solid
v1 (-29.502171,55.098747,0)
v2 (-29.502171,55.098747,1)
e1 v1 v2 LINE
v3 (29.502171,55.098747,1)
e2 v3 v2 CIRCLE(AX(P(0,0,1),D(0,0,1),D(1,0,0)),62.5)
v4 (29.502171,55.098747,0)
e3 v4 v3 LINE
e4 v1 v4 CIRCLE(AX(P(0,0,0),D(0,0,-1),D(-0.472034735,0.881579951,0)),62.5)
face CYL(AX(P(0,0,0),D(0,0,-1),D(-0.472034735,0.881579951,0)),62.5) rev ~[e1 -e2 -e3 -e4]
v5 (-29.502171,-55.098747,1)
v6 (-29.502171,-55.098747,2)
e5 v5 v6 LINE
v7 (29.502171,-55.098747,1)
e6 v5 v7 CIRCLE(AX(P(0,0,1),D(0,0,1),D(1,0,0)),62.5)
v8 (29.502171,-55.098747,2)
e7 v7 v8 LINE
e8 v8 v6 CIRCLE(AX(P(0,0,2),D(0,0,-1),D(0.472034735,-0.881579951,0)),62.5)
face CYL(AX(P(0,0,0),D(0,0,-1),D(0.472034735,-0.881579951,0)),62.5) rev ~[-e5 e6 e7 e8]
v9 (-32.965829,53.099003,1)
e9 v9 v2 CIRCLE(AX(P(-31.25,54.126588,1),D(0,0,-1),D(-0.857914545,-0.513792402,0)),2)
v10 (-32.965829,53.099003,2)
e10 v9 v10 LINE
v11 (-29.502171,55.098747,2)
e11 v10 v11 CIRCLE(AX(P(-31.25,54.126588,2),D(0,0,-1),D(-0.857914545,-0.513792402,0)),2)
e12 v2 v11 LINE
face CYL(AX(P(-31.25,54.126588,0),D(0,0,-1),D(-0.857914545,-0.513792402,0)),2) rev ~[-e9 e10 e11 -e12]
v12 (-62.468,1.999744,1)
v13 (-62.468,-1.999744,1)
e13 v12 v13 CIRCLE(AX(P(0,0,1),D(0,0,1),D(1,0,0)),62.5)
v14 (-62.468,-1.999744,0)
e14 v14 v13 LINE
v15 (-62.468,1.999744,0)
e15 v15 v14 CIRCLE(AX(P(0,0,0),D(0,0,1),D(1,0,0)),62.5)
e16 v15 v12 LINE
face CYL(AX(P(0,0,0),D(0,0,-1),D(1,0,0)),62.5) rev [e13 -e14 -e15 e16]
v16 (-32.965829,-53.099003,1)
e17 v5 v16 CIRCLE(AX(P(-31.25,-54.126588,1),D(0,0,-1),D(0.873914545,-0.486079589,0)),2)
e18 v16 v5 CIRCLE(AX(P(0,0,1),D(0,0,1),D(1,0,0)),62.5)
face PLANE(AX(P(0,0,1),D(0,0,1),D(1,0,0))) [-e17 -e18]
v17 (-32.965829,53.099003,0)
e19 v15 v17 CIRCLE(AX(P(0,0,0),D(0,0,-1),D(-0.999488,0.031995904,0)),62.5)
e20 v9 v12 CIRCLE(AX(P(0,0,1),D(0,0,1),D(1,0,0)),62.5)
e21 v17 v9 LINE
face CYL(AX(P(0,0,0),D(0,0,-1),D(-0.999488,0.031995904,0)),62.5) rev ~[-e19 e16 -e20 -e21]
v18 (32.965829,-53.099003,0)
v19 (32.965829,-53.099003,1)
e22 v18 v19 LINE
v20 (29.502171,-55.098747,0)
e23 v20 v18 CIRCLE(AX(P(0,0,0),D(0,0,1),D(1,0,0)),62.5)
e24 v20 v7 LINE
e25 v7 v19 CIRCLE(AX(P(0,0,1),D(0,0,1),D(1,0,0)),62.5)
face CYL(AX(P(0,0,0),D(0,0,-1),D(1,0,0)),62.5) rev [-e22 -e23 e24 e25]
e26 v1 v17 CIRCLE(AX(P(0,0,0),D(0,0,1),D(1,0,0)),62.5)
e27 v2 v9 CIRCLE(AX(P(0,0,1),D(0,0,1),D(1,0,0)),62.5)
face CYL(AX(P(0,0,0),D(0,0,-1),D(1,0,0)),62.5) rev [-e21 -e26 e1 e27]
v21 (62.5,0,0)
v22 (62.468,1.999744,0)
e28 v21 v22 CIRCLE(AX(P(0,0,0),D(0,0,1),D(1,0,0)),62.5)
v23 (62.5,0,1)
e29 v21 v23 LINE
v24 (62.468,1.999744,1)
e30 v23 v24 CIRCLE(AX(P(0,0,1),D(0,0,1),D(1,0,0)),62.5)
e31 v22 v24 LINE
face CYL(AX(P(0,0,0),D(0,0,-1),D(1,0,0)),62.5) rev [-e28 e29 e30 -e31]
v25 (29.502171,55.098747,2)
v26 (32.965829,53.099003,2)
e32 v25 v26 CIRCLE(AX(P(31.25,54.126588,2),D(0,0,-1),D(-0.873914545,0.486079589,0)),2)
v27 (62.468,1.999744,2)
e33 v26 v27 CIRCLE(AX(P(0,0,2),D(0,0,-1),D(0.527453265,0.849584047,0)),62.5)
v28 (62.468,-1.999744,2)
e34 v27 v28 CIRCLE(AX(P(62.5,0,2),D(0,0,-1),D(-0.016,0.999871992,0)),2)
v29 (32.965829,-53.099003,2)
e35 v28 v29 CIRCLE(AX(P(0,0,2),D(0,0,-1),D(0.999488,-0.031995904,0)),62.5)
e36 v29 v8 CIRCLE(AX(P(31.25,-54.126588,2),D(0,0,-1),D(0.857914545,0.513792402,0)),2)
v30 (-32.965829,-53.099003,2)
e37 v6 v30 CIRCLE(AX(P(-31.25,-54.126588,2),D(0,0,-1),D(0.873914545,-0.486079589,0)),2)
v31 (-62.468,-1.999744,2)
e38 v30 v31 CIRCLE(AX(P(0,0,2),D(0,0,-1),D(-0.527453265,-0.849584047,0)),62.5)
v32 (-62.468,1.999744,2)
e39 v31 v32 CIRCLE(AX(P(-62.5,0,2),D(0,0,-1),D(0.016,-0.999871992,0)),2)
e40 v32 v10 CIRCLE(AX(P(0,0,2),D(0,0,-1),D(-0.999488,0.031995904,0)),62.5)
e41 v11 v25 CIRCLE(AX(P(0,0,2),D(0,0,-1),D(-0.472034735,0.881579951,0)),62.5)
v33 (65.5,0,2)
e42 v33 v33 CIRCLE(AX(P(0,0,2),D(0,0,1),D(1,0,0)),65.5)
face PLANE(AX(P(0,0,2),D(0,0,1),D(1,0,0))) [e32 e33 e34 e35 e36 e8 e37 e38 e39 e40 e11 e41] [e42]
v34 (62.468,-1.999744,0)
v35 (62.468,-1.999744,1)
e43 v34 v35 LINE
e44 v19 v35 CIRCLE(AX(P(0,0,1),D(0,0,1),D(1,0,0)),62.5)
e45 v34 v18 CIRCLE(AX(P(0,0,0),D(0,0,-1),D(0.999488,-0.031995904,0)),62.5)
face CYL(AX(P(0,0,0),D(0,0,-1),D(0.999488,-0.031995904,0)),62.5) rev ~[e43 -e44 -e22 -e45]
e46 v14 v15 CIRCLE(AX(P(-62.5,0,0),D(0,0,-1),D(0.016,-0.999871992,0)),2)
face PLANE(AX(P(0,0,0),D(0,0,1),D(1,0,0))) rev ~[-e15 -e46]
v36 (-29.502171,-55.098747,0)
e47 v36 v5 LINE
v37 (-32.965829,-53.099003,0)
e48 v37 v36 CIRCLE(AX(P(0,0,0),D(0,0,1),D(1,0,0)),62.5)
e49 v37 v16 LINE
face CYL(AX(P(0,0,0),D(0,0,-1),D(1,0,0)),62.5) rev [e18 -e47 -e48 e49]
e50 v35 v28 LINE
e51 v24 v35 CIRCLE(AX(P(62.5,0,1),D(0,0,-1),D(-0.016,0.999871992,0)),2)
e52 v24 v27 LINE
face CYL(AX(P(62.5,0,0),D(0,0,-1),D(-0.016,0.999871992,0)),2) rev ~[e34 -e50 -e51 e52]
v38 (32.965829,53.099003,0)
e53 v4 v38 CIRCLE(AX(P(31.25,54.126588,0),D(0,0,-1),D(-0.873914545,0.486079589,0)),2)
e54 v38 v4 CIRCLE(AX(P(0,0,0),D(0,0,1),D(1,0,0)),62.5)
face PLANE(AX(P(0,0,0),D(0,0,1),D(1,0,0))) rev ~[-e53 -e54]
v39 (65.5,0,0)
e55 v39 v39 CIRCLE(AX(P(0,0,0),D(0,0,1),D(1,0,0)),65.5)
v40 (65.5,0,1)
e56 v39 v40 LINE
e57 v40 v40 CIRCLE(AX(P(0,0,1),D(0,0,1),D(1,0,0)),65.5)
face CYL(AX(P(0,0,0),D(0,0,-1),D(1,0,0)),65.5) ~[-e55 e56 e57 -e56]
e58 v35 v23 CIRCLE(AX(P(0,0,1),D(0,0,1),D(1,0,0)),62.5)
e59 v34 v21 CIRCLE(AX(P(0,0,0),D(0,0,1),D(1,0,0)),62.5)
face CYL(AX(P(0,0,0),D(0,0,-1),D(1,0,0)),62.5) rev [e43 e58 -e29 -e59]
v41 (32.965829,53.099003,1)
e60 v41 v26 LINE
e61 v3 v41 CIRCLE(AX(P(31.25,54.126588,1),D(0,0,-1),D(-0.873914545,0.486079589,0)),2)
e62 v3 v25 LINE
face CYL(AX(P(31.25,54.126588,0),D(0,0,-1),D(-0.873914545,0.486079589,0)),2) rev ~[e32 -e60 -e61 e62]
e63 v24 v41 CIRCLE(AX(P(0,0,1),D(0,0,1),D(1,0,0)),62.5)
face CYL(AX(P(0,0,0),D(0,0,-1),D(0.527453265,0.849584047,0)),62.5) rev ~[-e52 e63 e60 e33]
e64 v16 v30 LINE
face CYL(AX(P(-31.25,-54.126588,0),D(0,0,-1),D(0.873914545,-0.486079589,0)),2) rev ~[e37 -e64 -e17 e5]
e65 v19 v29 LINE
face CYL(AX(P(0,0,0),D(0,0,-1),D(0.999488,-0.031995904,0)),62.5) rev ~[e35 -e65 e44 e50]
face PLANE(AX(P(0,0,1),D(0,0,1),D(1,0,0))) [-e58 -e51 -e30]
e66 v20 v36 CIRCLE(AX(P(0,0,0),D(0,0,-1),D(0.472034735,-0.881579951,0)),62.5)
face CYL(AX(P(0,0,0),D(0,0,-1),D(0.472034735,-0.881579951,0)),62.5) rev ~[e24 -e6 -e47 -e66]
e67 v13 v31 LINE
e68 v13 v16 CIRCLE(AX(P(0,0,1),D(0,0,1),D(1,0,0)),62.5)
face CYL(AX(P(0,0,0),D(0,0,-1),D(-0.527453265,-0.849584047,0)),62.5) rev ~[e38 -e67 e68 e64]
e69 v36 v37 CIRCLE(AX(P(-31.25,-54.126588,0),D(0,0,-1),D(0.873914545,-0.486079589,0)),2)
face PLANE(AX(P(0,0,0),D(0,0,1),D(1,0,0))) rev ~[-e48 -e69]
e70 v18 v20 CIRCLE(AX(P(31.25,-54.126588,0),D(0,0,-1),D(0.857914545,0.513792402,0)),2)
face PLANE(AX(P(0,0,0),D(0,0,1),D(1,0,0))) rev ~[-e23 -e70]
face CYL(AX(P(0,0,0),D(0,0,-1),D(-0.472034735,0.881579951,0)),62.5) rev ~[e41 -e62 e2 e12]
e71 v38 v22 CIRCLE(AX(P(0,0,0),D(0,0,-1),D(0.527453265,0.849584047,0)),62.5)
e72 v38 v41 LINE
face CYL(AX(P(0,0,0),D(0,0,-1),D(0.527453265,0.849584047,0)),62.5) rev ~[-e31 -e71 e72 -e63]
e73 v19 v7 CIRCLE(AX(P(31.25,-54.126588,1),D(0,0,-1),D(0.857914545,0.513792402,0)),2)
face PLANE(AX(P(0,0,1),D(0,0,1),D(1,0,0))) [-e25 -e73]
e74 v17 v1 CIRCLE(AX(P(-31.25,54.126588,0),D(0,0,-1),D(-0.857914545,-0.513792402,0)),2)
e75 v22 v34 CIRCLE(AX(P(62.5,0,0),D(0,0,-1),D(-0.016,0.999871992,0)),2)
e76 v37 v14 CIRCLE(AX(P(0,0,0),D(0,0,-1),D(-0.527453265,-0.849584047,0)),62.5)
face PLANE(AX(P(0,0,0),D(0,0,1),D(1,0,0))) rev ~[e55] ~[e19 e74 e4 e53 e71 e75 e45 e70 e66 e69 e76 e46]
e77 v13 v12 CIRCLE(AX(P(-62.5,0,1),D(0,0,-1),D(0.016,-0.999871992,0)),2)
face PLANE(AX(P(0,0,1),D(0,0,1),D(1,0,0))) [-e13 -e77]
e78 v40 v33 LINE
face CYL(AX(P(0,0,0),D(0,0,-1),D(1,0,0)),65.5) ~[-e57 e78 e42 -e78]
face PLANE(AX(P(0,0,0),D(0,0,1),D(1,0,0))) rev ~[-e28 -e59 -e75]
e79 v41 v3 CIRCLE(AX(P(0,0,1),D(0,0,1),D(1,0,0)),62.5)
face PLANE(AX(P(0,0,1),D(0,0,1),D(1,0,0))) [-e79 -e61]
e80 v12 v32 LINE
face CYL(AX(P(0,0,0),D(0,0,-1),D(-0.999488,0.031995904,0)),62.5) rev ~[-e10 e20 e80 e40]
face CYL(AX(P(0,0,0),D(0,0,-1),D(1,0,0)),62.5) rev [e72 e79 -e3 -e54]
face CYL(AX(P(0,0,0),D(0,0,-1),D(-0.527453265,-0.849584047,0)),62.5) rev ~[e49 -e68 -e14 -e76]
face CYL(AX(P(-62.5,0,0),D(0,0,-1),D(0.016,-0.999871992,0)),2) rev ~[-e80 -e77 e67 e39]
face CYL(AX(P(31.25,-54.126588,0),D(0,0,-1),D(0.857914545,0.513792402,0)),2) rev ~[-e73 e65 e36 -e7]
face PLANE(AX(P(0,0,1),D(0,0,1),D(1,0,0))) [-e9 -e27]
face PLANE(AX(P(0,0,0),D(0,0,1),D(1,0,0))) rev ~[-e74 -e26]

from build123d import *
from build123d import SkipClean  # not in build123d's __all__

# Parameters (mm, degrees)
F0_R     = 65.5
F1_DEPTH = 2
F2_R     = 65.5
F2_R_2   = 62.5
F3_DEPTH = 1


with BuildPart() as f1:
    # F0 (on Top) → F1 (new body)
    with BuildSketch(Plane.XY):
        Circle(F0_R)
        with BuildLine():
            ThreePointArc((32.9658290909, 53.0990029318), (54.1265877365, 31.25), (62.468, 1.9997439836))
            ThreePointArc((62.468, 1.9997439836), (64.5, 0), (62.468, -1.9997439836))
            ThreePointArc((62.468, -1.9997439836), (54.1265877365, -31.25), (32.9658290909, -53.0990029318))
            ThreePointArc((32.9658290909, -53.0990029318), (32.25, -55.8586385441), (29.5021709091, -55.0987469154))
            ThreePointArc((29.5021709091, -55.0987469154), (0, -62.5), (-29.5021709091, -55.0987469154))
            ThreePointArc((-29.5021709091, -55.0987469154), (-32.25, -55.8586385441), (-32.9658290909, -53.0990029318))
            ThreePointArc((-32.9658290909, -53.0990029318), (-54.1265877365, -31.25), (-62.468, -1.9997439836))
            ThreePointArc((-62.468, -1.9997439836), (-64.5, 0), (-62.468, 1.9997439836))
            ThreePointArc((-62.468, 1.9997439836), (-54.1265877365, 31.25), (-32.9658290909, 53.0990029318))
            ThreePointArc((-32.9658290909, 53.0990029318), (-32.25, 55.8586385441), (-29.5021709091, 55.0987469154))
            ThreePointArc((-29.5021709091, 55.0987469154), (0, 62.5), (29.5021709091, 55.0987469154))
            ThreePointArc((29.5021709091, 55.0987469154), (32.25, 55.8586385441), (32.9658290909, 53.0990029318))
        make_face(mode=Mode.SUBTRACT)
    extrude(amount=F1_DEPTH)

    # F2 (on Top) → F3 (join)
    with BuildSketch(Plane.XY):
        Circle(F2_R)
        Circle(F2_R_2, mode=Mode.SUBTRACT)
    with SkipClean():  # cleaning this boolean's faces spoils the solid; the shape is the same uncleaned
        extrude(amount=F3_DEPTH)


solid = f1.part
